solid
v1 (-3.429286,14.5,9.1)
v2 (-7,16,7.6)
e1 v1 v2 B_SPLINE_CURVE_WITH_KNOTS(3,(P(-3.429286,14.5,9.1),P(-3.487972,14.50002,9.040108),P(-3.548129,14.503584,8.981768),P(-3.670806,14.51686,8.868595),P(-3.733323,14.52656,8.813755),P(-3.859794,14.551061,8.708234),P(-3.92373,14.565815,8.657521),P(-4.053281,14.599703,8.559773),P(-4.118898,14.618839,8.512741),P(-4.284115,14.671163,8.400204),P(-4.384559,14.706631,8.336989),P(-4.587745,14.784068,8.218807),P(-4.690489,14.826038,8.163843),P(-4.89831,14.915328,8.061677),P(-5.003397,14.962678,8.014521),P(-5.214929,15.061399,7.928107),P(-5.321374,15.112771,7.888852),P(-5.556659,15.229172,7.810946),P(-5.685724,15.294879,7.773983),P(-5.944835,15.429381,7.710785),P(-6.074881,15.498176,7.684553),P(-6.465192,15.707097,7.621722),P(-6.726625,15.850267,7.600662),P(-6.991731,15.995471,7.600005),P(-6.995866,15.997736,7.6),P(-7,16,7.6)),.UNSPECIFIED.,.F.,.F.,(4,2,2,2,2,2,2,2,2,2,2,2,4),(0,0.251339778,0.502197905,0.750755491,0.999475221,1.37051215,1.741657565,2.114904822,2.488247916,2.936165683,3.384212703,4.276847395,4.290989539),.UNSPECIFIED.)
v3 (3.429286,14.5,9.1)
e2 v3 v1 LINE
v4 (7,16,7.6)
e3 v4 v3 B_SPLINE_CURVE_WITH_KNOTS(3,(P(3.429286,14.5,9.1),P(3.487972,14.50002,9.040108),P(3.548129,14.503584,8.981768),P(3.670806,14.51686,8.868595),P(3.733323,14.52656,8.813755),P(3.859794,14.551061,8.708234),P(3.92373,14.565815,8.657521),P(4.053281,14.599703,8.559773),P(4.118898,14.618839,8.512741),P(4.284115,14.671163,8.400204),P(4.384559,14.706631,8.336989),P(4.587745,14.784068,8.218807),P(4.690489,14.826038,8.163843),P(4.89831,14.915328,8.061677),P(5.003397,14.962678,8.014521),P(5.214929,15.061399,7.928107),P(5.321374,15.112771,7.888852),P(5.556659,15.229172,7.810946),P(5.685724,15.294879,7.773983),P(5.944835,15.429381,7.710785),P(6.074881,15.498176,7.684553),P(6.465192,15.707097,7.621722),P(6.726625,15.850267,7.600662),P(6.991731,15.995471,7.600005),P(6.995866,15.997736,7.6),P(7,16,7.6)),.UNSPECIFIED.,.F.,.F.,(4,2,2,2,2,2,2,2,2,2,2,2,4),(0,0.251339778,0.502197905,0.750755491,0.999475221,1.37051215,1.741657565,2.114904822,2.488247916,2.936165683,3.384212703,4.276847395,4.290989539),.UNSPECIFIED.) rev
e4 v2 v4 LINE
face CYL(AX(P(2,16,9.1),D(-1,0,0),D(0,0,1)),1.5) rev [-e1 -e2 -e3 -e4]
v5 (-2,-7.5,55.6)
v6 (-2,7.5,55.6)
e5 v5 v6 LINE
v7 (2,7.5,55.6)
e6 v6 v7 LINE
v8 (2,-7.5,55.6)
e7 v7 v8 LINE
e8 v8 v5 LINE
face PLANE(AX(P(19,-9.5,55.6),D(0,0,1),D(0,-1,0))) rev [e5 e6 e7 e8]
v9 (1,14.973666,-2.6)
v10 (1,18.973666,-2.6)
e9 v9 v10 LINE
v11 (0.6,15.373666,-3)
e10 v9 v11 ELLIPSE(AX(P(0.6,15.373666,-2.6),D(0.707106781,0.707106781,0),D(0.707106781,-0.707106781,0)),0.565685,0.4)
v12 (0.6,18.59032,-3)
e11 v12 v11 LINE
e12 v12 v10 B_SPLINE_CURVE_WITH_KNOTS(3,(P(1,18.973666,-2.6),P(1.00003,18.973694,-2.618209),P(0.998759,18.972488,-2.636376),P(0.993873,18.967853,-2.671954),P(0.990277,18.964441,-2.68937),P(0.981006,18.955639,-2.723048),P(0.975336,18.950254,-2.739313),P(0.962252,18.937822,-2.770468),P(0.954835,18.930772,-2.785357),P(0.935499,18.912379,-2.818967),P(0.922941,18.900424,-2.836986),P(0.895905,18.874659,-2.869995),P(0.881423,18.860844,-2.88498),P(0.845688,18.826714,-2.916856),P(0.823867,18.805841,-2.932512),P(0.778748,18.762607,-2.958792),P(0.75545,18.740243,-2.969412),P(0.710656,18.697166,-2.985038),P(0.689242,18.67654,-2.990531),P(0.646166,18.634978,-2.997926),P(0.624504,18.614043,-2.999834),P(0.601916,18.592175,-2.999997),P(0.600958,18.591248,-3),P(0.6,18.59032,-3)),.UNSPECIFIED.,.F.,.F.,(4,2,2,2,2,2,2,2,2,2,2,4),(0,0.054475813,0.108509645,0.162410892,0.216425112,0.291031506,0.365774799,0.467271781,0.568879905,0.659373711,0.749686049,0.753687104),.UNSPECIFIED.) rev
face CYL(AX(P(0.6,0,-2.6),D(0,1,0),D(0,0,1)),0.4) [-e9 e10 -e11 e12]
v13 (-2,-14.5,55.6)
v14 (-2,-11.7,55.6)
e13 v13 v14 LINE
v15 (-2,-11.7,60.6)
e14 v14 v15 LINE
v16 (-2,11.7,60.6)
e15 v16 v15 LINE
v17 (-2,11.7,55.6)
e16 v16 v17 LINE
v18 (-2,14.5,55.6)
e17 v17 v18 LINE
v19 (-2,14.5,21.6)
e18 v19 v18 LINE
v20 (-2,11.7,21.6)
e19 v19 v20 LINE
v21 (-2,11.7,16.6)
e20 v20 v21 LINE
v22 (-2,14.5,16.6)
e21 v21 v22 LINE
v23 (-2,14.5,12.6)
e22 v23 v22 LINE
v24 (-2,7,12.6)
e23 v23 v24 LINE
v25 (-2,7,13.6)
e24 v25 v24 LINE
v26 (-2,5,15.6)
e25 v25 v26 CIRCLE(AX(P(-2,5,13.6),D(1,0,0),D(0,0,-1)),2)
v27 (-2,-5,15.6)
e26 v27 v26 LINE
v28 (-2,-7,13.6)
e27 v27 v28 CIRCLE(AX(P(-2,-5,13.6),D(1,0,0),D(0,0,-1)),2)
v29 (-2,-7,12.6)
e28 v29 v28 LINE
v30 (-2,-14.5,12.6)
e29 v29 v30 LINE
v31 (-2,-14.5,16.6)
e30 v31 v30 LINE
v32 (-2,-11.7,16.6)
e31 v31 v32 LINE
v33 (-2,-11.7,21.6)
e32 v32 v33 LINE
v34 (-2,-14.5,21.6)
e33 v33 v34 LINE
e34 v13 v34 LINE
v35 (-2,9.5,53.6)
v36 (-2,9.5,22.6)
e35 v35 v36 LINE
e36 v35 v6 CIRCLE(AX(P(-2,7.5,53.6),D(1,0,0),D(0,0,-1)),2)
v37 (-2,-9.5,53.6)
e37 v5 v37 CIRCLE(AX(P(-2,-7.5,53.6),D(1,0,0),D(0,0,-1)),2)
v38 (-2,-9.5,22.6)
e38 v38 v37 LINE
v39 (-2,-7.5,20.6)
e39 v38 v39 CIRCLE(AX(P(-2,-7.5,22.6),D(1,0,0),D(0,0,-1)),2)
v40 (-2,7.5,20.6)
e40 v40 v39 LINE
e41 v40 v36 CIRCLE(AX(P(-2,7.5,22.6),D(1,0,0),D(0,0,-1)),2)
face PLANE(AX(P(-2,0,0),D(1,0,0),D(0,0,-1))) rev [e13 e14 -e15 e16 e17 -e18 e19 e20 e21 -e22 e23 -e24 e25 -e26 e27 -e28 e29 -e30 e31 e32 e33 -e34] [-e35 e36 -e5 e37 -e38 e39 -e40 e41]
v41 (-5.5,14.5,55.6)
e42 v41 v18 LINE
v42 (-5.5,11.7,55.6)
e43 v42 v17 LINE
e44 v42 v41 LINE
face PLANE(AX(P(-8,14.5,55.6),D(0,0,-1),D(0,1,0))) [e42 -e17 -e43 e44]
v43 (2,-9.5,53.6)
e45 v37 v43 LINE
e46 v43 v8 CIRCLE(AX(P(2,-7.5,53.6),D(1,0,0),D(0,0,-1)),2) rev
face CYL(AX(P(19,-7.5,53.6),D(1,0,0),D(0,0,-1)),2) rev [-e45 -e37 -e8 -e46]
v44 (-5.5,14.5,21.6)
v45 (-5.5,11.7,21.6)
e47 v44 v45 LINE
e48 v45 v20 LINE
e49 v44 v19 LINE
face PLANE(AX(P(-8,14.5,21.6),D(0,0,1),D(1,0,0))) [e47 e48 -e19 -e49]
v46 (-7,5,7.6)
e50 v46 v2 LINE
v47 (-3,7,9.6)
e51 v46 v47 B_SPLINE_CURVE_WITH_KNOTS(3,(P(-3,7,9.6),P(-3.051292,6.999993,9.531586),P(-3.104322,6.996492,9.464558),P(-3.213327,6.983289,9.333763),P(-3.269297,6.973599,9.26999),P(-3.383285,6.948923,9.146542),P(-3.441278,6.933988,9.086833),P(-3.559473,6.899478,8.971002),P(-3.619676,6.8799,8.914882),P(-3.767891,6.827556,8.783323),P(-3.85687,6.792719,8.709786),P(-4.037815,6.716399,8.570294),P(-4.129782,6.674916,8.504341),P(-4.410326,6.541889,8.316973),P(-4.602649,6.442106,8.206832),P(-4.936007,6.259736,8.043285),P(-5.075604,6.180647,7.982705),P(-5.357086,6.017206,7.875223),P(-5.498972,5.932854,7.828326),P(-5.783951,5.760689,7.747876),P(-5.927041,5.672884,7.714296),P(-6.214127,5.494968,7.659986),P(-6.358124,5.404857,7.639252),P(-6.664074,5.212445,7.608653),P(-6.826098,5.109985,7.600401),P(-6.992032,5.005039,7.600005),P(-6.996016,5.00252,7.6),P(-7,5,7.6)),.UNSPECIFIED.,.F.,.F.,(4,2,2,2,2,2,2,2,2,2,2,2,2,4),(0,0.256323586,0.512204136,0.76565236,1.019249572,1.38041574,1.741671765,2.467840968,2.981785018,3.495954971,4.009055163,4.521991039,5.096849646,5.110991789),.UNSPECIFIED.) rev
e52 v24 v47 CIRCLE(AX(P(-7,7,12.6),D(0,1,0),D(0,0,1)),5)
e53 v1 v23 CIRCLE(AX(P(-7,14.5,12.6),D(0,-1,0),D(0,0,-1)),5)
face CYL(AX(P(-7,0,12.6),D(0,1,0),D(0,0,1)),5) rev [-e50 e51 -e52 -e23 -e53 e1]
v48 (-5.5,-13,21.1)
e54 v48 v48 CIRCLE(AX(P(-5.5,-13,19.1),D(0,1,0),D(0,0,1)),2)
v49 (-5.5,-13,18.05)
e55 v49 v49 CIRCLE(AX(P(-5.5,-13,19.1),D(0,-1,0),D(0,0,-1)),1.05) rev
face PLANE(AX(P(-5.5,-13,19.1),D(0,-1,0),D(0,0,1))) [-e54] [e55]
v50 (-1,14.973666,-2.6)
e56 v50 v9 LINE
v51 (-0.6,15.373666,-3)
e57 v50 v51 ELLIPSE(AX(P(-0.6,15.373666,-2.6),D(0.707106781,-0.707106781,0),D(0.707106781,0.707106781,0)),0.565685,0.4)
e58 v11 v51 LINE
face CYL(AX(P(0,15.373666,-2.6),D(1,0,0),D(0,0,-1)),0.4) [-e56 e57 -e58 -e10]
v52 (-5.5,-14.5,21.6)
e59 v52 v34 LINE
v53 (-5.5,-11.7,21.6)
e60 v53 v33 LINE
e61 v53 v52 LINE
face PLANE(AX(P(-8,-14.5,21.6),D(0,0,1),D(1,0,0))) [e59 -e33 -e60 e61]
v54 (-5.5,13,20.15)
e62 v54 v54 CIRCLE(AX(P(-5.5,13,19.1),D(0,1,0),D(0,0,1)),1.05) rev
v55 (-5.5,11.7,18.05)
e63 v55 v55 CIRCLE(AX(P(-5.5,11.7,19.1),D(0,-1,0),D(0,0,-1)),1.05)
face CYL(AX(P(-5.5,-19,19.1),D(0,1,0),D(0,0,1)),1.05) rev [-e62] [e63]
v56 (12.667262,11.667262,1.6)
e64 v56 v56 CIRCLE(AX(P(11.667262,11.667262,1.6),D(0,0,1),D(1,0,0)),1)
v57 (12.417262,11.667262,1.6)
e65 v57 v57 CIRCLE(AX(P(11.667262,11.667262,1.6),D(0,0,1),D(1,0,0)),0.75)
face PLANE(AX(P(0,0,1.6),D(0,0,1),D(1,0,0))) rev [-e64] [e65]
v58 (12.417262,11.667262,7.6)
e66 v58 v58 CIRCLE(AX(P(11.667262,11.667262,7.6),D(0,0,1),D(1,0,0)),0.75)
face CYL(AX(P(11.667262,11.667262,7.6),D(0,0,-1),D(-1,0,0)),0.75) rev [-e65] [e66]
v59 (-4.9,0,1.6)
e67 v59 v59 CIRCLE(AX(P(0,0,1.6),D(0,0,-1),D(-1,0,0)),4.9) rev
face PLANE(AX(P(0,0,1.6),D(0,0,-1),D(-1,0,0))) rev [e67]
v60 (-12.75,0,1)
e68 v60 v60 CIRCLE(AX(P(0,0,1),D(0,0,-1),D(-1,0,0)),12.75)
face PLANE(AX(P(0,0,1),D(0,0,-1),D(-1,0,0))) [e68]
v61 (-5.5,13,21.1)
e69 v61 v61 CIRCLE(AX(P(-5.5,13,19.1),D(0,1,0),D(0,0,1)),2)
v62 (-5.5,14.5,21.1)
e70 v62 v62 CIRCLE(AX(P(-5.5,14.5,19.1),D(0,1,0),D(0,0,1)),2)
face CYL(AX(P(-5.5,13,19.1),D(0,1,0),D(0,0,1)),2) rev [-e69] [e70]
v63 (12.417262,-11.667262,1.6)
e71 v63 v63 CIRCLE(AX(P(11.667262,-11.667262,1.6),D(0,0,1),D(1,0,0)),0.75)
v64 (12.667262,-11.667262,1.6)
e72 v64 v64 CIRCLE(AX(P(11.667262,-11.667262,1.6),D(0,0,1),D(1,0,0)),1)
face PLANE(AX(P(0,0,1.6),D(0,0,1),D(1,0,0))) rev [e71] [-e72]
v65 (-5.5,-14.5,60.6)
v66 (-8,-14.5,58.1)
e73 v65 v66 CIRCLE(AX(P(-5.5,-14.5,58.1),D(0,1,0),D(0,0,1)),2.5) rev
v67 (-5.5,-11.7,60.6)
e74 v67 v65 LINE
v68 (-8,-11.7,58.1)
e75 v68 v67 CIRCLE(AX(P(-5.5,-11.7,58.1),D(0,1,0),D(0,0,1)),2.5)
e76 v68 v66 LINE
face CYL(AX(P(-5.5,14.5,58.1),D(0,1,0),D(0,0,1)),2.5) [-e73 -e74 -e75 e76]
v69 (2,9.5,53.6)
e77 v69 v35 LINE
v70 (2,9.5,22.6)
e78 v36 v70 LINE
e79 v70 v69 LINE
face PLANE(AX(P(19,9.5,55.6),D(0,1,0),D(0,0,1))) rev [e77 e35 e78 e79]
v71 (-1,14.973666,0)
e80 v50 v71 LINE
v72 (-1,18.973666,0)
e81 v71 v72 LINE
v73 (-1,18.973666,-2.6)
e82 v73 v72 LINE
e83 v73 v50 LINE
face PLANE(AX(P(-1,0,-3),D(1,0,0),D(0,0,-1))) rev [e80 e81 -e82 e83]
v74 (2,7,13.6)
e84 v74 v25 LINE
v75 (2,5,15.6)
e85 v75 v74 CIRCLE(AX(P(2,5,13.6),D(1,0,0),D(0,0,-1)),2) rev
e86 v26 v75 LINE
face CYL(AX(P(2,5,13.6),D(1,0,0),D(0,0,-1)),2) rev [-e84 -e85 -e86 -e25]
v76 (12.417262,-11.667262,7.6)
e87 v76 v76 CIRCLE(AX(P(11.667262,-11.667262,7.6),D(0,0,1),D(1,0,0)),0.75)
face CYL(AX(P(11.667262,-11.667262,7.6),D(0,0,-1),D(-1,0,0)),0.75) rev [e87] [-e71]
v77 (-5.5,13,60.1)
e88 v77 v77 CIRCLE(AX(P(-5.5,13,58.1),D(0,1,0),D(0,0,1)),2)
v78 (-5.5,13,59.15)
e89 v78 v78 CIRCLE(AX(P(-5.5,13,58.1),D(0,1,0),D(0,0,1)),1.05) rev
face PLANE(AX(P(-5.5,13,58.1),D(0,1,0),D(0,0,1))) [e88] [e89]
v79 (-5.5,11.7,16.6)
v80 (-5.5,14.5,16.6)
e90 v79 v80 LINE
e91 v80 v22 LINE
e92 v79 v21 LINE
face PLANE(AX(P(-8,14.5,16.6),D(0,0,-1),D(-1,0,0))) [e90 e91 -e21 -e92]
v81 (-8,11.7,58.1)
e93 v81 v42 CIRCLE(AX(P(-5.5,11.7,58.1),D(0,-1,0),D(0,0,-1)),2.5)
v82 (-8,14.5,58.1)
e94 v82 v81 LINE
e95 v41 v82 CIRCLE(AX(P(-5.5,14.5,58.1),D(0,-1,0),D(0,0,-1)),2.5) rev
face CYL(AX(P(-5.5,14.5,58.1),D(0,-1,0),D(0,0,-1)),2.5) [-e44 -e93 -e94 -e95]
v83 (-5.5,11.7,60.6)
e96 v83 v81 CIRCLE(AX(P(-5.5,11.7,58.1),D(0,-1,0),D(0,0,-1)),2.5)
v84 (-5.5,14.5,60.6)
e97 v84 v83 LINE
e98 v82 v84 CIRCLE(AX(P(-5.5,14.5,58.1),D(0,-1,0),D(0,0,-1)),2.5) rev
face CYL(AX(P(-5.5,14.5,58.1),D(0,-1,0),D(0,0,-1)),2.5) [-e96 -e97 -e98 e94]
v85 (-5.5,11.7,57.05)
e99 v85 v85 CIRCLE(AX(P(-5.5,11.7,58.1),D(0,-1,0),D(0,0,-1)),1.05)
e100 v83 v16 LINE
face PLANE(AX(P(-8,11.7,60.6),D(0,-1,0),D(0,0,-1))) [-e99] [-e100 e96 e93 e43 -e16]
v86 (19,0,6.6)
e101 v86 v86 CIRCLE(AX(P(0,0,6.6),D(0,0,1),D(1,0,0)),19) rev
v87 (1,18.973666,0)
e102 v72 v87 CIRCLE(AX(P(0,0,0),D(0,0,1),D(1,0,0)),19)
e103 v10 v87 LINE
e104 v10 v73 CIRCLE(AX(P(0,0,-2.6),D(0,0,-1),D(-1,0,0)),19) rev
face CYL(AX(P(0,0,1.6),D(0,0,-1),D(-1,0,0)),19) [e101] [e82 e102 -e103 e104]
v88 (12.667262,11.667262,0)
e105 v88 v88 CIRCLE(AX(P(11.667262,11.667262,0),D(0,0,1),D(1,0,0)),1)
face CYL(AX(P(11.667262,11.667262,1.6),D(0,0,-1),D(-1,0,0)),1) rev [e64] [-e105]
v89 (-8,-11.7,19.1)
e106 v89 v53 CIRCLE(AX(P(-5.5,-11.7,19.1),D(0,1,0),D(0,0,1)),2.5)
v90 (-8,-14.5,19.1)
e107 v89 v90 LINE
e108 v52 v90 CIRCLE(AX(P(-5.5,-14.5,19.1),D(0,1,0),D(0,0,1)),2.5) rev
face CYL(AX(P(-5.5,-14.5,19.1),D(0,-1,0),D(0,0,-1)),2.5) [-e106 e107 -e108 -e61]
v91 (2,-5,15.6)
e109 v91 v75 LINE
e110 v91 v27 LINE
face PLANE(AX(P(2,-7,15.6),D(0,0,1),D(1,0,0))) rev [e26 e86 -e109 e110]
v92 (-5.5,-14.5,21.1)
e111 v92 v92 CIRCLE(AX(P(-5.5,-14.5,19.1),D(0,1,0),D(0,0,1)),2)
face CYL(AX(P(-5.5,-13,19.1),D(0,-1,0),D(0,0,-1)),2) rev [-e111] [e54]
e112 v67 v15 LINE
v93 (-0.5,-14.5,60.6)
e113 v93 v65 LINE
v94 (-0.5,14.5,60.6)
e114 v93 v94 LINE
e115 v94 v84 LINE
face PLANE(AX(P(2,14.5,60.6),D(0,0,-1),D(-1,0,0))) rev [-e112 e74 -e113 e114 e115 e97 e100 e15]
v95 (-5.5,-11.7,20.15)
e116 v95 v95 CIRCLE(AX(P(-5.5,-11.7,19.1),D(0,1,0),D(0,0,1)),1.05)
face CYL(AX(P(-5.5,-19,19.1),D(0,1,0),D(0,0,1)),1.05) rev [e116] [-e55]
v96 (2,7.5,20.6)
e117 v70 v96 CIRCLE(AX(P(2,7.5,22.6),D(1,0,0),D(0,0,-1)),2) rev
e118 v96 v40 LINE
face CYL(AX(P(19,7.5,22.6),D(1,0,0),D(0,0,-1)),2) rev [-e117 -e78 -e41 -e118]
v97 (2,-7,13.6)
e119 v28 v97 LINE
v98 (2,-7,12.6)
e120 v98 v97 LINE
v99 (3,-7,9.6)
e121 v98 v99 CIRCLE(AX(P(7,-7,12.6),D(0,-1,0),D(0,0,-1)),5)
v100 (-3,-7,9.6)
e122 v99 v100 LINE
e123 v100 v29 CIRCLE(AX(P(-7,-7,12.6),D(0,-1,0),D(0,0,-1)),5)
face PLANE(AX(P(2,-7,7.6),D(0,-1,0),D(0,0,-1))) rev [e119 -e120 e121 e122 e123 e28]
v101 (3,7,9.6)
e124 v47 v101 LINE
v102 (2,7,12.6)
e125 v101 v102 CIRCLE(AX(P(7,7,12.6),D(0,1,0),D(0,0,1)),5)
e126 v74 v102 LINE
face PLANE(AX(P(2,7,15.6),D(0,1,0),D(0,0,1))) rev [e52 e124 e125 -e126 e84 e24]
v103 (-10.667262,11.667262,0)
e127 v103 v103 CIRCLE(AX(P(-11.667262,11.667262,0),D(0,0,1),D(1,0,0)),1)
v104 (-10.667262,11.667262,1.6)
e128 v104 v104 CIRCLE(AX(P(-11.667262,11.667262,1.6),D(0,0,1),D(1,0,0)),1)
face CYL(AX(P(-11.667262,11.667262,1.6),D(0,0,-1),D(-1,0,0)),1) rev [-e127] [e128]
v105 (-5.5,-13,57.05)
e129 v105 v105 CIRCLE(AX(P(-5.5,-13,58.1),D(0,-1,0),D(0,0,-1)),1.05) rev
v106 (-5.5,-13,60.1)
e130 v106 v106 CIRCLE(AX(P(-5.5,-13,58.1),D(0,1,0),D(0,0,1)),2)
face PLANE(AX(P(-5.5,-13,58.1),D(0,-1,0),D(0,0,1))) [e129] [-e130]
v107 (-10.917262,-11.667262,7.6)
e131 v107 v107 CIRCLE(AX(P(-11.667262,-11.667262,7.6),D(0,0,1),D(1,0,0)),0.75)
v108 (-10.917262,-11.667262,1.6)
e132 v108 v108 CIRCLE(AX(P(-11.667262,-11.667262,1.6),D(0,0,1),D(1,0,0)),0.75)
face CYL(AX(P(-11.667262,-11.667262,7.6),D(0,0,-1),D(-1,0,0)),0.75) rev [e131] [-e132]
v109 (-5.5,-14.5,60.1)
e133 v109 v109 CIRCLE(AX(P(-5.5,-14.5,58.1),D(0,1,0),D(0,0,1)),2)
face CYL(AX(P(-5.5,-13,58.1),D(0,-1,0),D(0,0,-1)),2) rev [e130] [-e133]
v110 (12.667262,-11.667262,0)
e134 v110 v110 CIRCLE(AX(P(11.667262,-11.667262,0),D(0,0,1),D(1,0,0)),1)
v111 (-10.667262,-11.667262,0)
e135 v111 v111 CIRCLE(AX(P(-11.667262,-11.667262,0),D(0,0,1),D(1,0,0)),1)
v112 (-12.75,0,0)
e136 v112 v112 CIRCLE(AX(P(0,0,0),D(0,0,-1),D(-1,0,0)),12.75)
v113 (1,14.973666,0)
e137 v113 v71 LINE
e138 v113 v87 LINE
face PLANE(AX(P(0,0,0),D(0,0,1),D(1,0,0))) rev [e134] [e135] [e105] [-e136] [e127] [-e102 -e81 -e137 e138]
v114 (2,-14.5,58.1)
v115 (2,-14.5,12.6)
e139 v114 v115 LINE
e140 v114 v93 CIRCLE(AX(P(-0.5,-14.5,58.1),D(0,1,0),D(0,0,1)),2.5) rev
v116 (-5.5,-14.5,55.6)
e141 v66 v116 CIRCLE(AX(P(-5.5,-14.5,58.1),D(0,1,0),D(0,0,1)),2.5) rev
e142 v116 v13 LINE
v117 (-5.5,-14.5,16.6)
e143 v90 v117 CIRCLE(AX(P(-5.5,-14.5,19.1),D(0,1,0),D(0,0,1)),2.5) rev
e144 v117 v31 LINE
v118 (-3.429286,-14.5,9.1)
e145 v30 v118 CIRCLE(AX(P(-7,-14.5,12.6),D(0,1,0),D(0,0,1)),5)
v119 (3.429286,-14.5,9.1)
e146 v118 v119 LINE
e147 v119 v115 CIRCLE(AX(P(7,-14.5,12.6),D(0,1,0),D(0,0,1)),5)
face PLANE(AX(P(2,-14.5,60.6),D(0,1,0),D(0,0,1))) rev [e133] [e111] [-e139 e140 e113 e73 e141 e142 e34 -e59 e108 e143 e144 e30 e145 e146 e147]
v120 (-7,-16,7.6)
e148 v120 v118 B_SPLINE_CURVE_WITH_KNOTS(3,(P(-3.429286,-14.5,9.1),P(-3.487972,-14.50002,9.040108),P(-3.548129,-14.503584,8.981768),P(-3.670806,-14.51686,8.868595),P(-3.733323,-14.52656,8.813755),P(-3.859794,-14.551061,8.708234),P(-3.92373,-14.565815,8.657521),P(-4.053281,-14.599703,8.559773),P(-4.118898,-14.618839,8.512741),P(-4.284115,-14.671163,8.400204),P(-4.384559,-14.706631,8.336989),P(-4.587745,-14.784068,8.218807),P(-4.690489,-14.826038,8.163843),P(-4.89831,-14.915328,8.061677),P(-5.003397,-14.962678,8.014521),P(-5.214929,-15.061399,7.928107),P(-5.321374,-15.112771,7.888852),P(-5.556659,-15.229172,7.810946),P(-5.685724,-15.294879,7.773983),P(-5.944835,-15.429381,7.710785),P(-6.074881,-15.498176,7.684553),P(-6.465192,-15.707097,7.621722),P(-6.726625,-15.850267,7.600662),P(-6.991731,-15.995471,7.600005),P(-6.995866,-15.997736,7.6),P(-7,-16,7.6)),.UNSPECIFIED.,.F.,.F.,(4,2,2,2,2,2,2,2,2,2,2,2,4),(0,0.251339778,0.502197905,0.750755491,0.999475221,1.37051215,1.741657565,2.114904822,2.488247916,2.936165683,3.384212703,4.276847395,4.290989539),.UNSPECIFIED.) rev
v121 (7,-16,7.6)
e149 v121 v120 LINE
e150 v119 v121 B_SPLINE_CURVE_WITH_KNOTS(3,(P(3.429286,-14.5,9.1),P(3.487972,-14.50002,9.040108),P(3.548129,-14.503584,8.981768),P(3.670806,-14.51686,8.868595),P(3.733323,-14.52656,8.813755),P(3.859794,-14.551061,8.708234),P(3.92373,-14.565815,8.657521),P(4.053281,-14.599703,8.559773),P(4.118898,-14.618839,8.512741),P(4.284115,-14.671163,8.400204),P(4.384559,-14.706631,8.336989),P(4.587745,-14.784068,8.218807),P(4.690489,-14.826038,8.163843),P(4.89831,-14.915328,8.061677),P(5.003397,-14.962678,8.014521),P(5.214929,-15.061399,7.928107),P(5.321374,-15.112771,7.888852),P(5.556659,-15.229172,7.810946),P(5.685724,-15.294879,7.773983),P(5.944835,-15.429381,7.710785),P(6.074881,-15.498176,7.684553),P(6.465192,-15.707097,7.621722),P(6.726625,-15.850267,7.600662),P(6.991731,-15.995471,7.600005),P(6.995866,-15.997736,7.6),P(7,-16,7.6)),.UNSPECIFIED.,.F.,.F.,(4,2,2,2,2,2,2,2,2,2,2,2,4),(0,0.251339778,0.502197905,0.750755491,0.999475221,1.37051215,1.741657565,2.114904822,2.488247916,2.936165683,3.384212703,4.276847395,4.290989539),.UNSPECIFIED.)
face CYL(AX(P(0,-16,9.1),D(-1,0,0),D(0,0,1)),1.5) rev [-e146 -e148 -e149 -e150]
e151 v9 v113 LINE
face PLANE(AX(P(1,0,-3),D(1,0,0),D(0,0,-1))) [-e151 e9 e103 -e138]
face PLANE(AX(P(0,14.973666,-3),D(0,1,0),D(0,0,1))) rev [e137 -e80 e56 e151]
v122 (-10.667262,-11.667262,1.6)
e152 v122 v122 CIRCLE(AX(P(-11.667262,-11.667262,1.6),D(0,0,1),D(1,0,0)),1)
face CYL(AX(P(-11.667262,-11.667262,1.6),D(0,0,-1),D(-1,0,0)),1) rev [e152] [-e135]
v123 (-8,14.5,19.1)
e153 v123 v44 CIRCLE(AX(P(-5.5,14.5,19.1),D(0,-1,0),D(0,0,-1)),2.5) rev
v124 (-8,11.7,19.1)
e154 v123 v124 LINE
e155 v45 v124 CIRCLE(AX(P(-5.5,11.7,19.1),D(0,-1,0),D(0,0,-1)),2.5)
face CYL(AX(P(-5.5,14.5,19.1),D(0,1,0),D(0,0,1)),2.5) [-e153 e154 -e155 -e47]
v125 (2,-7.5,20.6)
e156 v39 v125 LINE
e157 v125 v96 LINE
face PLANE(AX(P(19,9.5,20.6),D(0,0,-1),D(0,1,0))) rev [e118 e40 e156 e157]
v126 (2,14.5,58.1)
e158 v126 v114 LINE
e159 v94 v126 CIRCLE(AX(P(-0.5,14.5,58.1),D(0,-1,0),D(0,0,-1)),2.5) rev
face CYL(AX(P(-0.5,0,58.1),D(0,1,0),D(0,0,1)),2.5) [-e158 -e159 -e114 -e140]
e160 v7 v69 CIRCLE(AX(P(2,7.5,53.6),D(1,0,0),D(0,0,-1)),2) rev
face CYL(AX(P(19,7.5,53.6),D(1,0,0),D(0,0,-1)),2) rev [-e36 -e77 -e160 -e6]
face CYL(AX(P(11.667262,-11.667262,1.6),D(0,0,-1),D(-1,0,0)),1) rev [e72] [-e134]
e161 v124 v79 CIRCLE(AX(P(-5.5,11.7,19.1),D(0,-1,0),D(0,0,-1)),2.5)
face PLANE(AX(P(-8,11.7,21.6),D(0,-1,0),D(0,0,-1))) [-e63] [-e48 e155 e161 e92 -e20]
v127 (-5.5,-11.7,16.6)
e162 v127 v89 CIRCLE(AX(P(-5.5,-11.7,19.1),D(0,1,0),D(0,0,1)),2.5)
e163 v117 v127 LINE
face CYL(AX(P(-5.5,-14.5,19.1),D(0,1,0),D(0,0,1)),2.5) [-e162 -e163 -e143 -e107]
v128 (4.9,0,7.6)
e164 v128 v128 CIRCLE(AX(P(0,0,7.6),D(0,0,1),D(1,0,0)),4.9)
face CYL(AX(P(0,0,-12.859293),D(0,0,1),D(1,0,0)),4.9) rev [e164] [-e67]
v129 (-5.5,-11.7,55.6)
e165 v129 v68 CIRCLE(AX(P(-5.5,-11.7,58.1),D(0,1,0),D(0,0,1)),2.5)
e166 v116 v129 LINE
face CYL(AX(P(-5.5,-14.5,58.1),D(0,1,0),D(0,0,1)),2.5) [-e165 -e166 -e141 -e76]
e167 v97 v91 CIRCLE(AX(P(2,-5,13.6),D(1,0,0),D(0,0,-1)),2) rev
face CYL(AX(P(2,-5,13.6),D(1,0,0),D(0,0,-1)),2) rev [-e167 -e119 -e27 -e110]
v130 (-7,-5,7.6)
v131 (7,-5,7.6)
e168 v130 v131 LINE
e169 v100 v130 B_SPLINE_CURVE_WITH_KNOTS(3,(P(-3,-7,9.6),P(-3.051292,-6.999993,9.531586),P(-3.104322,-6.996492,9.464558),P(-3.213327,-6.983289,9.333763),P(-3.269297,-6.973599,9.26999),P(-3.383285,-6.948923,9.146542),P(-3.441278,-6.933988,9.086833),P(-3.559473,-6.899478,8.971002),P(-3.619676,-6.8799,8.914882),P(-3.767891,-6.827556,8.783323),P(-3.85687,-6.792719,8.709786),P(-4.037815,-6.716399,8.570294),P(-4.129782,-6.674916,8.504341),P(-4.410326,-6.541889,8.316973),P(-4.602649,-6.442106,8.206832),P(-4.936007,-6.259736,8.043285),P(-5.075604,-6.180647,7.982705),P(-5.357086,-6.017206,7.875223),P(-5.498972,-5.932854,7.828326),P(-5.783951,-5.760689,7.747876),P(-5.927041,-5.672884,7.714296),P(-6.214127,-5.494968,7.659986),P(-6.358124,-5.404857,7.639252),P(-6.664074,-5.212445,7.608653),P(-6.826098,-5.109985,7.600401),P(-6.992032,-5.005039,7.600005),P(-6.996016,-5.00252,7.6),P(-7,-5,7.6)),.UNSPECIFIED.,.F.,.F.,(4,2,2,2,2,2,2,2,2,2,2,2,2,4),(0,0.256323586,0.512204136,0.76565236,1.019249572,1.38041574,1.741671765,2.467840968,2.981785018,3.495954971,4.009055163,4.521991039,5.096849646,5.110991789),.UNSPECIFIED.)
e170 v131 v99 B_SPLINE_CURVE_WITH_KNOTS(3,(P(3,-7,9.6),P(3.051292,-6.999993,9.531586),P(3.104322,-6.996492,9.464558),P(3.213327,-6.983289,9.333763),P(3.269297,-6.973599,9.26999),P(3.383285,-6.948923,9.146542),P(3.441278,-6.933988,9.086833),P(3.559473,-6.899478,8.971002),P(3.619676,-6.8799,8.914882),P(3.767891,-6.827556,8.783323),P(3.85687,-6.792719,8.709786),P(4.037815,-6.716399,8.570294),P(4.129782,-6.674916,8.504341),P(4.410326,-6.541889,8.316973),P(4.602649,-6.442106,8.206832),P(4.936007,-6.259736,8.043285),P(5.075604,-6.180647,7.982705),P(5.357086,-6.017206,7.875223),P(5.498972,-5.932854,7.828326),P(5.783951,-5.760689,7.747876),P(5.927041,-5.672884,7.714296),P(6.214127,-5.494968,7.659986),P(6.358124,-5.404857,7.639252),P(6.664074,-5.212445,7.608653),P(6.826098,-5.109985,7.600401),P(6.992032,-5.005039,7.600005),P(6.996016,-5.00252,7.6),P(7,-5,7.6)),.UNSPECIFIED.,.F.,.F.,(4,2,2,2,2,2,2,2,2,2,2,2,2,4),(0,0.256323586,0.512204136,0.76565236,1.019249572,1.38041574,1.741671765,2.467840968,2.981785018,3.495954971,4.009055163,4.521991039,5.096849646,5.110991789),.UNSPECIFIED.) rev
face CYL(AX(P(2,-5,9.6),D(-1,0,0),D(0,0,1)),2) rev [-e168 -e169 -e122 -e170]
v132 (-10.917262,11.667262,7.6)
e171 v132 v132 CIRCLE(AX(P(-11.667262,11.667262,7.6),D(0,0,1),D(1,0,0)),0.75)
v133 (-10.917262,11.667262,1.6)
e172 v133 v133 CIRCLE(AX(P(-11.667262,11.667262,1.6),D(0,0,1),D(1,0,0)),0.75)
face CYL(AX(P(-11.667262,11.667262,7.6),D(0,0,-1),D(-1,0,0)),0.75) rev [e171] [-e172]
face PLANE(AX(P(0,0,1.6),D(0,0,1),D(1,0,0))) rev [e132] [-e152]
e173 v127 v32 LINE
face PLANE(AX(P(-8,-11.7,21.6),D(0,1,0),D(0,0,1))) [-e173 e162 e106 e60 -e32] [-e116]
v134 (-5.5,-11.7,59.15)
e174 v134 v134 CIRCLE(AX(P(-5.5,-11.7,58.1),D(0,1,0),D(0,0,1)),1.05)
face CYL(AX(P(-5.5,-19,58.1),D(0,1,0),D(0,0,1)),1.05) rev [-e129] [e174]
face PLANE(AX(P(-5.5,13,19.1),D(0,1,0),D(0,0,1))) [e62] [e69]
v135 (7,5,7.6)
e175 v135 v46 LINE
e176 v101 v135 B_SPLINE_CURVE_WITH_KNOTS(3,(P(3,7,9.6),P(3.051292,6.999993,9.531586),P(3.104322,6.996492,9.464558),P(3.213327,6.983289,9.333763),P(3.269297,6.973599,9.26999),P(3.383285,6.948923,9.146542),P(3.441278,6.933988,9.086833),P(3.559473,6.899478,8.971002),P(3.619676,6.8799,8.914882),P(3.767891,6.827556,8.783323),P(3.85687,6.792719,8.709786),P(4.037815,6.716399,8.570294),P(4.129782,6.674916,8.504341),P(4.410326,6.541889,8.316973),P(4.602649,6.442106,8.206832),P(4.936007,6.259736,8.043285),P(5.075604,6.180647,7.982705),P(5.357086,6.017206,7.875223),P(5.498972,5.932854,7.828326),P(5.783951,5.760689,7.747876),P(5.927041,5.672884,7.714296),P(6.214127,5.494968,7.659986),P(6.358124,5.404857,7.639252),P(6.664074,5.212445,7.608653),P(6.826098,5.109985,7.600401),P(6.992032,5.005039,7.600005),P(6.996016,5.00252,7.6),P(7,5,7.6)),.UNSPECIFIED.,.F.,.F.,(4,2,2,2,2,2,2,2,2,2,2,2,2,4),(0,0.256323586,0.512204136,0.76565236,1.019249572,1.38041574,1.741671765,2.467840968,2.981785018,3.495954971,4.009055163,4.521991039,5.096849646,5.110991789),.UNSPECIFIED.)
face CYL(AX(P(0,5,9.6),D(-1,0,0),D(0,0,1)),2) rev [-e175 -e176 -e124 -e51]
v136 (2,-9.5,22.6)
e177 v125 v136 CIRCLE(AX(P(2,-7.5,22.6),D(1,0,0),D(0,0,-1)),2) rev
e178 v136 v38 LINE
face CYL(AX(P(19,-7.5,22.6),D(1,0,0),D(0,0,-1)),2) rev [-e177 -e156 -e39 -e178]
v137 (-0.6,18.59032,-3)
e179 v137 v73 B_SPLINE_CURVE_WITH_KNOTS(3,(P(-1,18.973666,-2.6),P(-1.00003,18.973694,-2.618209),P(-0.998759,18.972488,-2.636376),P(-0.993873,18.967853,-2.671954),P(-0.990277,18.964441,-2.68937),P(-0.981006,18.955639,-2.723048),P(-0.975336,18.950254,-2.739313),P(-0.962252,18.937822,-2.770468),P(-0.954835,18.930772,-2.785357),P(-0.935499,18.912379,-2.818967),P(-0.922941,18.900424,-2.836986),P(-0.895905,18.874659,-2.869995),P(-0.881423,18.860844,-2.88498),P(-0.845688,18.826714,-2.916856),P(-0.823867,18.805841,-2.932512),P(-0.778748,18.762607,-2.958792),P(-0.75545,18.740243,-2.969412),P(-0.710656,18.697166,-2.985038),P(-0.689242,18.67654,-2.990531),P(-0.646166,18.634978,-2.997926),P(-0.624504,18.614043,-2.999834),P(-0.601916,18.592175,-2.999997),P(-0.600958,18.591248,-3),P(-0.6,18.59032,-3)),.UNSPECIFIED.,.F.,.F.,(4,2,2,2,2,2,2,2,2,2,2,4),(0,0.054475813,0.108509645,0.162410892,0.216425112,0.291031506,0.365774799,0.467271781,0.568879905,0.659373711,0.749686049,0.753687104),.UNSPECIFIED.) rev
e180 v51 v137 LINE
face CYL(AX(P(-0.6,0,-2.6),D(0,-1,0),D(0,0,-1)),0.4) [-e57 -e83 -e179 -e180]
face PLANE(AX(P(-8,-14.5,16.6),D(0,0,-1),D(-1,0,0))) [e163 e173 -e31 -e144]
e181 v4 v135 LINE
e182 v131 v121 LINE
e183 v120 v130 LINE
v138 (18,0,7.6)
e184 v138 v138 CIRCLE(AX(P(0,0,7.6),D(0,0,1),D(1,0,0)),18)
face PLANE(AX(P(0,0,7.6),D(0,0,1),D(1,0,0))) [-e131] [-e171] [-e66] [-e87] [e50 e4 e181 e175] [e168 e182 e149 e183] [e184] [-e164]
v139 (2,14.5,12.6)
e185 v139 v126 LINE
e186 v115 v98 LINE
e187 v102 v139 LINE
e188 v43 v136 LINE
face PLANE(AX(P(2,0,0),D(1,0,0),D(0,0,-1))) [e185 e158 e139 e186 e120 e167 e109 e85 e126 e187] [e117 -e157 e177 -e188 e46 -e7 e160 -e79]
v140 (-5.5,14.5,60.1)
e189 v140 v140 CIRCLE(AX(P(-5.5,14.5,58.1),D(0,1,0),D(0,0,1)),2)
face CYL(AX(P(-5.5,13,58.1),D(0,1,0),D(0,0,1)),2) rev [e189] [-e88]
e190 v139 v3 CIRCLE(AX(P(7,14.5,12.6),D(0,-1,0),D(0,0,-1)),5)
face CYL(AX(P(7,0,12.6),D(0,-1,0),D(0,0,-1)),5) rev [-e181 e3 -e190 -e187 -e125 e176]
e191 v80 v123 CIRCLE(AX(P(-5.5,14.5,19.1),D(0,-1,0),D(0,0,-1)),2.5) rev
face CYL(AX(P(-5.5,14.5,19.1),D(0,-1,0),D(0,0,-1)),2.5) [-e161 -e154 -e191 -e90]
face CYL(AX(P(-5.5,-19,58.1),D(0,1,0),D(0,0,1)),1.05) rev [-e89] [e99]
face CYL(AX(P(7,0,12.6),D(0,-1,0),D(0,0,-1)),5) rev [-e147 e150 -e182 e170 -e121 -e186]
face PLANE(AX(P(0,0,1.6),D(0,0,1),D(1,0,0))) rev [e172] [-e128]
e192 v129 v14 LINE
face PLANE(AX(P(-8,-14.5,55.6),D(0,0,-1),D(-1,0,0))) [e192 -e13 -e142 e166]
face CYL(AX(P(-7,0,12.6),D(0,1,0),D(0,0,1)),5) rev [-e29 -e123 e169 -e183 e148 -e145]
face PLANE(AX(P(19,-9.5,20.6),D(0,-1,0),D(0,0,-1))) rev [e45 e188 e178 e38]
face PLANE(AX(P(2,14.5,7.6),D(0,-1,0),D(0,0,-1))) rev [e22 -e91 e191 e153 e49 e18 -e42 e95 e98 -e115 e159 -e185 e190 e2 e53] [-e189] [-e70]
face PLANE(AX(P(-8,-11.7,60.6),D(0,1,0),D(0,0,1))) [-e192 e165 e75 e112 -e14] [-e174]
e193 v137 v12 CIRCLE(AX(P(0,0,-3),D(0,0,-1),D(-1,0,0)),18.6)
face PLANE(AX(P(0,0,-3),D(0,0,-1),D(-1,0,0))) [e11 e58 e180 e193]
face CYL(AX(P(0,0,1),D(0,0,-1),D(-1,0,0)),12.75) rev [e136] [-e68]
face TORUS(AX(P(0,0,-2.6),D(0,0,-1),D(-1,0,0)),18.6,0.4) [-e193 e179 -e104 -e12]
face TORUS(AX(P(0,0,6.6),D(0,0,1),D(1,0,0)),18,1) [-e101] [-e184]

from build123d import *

# Parameters (mm, degrees)
SKETCH1_R           = 19
SKETCH1_R_2         = 1
BOSS_EXTRUDE1_DEPTH = 1.6
SKETCH2_R           = 19
SKETCH2_R_2         = 0.75
BOSS_EXTRUDE2_DEPTH = 6
SKETCH8_R           = 12.75
CUT_EXTRUDE4_DEPTH  = 1
SKETCH3_R           = 4.9
CUT_EXTRUDE1_DEPTH  = 6
BOSS_EXTRUDE3_DEPTH = 2
FILLET1_R           = 5
FILLET2_R           = 2
SKETCH5_W           = 5
SKETCH5_H           = 2.8
BOSS_EXTRUDE4_DEPTH = 6
SKETCH6_R           = 1.05
CUT_EXTRUDE2_DEPTH  = 72.802576555
SKETCH7_R           = 2
CUT_EXTRUDE3_DEPTH  = 1.5
FILLET3_R           = 2.5
FILLET4_R           = 2.5
FILLET5_R           = 1.5
FILLET6_R           = 2
BOSS_EXTRUDE5_START = 3
BOSS_EXTRUDE5_DEPTH = 3
FILLET8_R           = 1
SKETCH10_W          = 35
SKETCH10_H          = 19
CUT_EXTRUDE5_DEPTH  = 67.890657074
FILLET9_R           = 2
FILLET10_R          = 0.4


with BuildPart() as part:
    # Sketch1 → Boss-Extrude1 (new body)
    with BuildSketch(Plane.XY):
        Circle(SKETCH1_R)
        with Locations((-11.66726189, 11.66726189)):
            Circle(SKETCH1_R_2, mode=Mode.SUBTRACT)
        with Locations((11.66726189, 11.66726189)):
            Circle(SKETCH1_R_2, mode=Mode.SUBTRACT)
        with Locations((11.66726189, -11.66726189)):
            Circle(SKETCH1_R_2, mode=Mode.SUBTRACT)
        with Locations((-11.66726189, -11.66726189)):
            Circle(SKETCH1_R_2, mode=Mode.SUBTRACT)
    extrude(amount=BOSS_EXTRUDE1_DEPTH)

    # Sketch2 → Boss-Extrude2 (add)
    with BuildSketch(Plane.XY.offset(1.6)):
        Circle(SKETCH2_R)
        with Locations((-11.66726189, -11.66726189)):
            Circle(SKETCH2_R_2, mode=Mode.SUBTRACT)
        with Locations((-11.66726189, 11.66726189)):
            Circle(SKETCH2_R_2, mode=Mode.SUBTRACT)
        with Locations((11.66726189, 11.66726189)):
            Circle(SKETCH2_R_2, mode=Mode.SUBTRACT)
        with Locations((11.66726189, -11.66726189)):
            Circle(SKETCH2_R_2, mode=Mode.SUBTRACT)
    extrude(amount=BOSS_EXTRUDE2_DEPTH)

    # Sketch8 → Cut-Extrude4 (cut)
    with BuildSketch(Plane(origin=(0, 0, 0), x_dir=(-1, 0, 0), z_dir=(0, 0, -1))):
        Circle(SKETCH8_R)
    extrude(amount=-CUT_EXTRUDE4_DEPTH, mode=Mode.SUBTRACT)

    # Sketch3 → Cut-Extrude1 (cut)
    with BuildSketch(Plane.XY.offset(7.6)):
        Circle(SKETCH3_R)
    extrude(amount=-CUT_EXTRUDE1_DEPTH, mode=Mode.SUBTRACT)

    # Sketch4 → Boss-Extrude3 (add, symmetric)
    with BuildSketch(Plane(origin=(0, 0, 0), x_dir=(0, 0, -1), z_dir=(1, 0, 0))):
        Polygon((-7.6, 14.5), (-60.6, 14.5), (-60.6, -14.5), (-7.6, -14.5), (-7.6, -7), (-15.6, -7), (-15.6, 7), (-7.6, 7), align=None)
    extrude(amount=BOSS_EXTRUDE3_DEPTH, both=True)

    # Fillet1
    fillet1_edges = [part.edges().sort_by_distance(p)[0] for p in [
        (-2, 10.75, 7.6),
        (-2, -10.75, 7.6),
        (2, 10.75, 7.6),
        (2, -10.75, 7.6),
    ]]
    fillet(fillet1_edges, radius=FILLET1_R)

    # Fillet2
    fillet2_edges = [part.edges().sort_by_distance(p)[0] for p in [
        (0, -7, 15.6),
        (0, 7, 15.6),
    ]]
    fillet(fillet2_edges, radius=FILLET2_R)

    # Sketch5 → Boss-Extrude4 (add)
    with BuildSketch(Plane(origin=(-2, 14.5, 12.6), x_dir=(0, 0, -1), z_dir=(1, 0, 0))):
        with Locations((-45.5, -1.4)):
            Rectangle(SKETCH5_W, SKETCH5_H)
        with Locations((-6.5, -1.4)):
            Rectangle(SKETCH5_W, SKETCH5_H)
        with Locations((-6.5, -27.6)):
            Rectangle(SKETCH5_W, SKETCH5_H)
        with Locations((-45.5, -27.6)):
            Rectangle(SKETCH5_W, SKETCH5_H)
    extrude(amount=-BOSS_EXTRUDE4_DEPTH)

    # Sketch6 → Cut-Extrude2 (cut, through all)
    with BuildSketch(Plane(origin=(0, 14.5, 0), x_dir=(1, 0, 0), z_dir=(0, 1, 0))):
        with Locations(Location((-5.5, -58.1, 0), (0, 0, 270))):
            Circle(SKETCH6_R)
        with Locations(Location((-5.5, -19.1, 0), (0, 0, 270))):
            Circle(SKETCH6_R)
    extrude(amount=-CUT_EXTRUDE2_DEPTH, mode=Mode.SUBTRACT)

    # Sketch7 → Cut-Extrude3 (cut)
    with BuildSketch(Plane(origin=(0, 14.5, 0), x_dir=(1, 0, 0), z_dir=(0, 1, 0))):
        with Locations(Location((-5.5, -19.1, 0), (0, 0, 270))):
            Circle(SKETCH7_R)
        with Locations(Location((-5.5, -58.1, 0), (0, 0, 270))):
            Circle(SKETCH7_R)
    cut_extrude3 = extrude(amount=-CUT_EXTRUDE3_DEPTH, mode=Mode.SUBTRACT)

    # Mirror1: Cut-Extrude3 across plane
    add(cut_extrude3.mirror(Plane.ZX), mode=Mode.SUBTRACT)

    # Fillet3
    fillet3_edges = [part.edges().sort_by_distance(p)[0] for p in [
        (-8, -13.1, 60.6),
        (-8, -13.1, 55.6),
        (-8, 13.1, 60.6),
        (-8, 13.1, 55.6),
        (-8, -13.1, 21.6),
        (-8, -13.1, 16.6),
        (-8, 13.1, 21.6),
        (-8, 13.1, 16.6),
    ]]
    fillet(fillet3_edges, radius=FILLET3_R - 0.0001)  # a hair under: the kernel refuses the full size

    # Fillet4
    fillet4_edges = [part.edges().sort_by_distance(p)[0] for p in [
        (2, 0, 60.6),
    ]]
    fillet(fillet4_edges, radius=FILLET4_R)

    # Fillet5
    fillet5_edges = [part.edges().sort_by_distance(p)[0] for p in [
        (0, 14.5, 7.6),
        (0, -14.5, 7.6),
    ]]
    fillet(fillet5_edges, radius=FILLET5_R)

    # Fillet6
    fillet6_edges = [part.edges().sort_by_distance(p)[0] for p in [
        (0, 7, 7.6),
        (0, -7, 7.6),
    ]]
    fillet(fillet6_edges, radius=FILLET6_R)

    # Sketch9 → Boss-Extrude5 (add)
    with BuildSketch(Plane(origin=(0, 0, 0), x_dir=(-1, 0, 0), z_dir=(0, 0, -1)).offset(BOSS_EXTRUDE5_START)):
        with BuildLine():
            Line((-1, 18.973665961), (-1, 14.973665961))
            Line((-1, 14.973665961), (1, 14.973665961))
            Line((1, 14.973665961), (1, 18.973665961))
            ThreePointArc((1, 18.973665961), (0, 19), (-1, 18.973665961))
        make_face()
    extrude(amount=-BOSS_EXTRUDE5_DEPTH)

    # Fillet8
    fillet8_edges = [part.edges().sort_by_distance(p)[0] for p in [
        (-19, 0, 7.6),
    ]]
    fillet(fillet8_edges, radius=FILLET8_R)

    # Sketch10 → Cut-Extrude5 (cut, through all)
    with BuildSketch(Plane.ZY.offset(2)):
        with Locations((38.1, 0)):
            Rectangle(SKETCH10_W, SKETCH10_H)
    extrude(amount=-CUT_EXTRUDE5_DEPTH, mode=Mode.SUBTRACT)

    # Fillet9
    fillet9_edges = [part.edges().sort_by_distance(p)[0] for p in [
        (0, 9.5, 20.6),
        (0, 9.5, 55.6),
        (0, -9.5, 55.6),
        (0, -9.5, 20.6),
    ]]
    fillet(fillet9_edges, radius=FILLET9_R)

    # Fillet10
    fillet10_edges = [part.edges().sort_by_distance(p)[0] for p in [
        (1, 16.973665961, -3),
        (0, 14.973665961, -3),
        (-1, 16.973665961, -3),
        (0, 19, -3),
    ]]
    fillet(fillet10_edges, radius=FILLET10_R)


solid = part.part
